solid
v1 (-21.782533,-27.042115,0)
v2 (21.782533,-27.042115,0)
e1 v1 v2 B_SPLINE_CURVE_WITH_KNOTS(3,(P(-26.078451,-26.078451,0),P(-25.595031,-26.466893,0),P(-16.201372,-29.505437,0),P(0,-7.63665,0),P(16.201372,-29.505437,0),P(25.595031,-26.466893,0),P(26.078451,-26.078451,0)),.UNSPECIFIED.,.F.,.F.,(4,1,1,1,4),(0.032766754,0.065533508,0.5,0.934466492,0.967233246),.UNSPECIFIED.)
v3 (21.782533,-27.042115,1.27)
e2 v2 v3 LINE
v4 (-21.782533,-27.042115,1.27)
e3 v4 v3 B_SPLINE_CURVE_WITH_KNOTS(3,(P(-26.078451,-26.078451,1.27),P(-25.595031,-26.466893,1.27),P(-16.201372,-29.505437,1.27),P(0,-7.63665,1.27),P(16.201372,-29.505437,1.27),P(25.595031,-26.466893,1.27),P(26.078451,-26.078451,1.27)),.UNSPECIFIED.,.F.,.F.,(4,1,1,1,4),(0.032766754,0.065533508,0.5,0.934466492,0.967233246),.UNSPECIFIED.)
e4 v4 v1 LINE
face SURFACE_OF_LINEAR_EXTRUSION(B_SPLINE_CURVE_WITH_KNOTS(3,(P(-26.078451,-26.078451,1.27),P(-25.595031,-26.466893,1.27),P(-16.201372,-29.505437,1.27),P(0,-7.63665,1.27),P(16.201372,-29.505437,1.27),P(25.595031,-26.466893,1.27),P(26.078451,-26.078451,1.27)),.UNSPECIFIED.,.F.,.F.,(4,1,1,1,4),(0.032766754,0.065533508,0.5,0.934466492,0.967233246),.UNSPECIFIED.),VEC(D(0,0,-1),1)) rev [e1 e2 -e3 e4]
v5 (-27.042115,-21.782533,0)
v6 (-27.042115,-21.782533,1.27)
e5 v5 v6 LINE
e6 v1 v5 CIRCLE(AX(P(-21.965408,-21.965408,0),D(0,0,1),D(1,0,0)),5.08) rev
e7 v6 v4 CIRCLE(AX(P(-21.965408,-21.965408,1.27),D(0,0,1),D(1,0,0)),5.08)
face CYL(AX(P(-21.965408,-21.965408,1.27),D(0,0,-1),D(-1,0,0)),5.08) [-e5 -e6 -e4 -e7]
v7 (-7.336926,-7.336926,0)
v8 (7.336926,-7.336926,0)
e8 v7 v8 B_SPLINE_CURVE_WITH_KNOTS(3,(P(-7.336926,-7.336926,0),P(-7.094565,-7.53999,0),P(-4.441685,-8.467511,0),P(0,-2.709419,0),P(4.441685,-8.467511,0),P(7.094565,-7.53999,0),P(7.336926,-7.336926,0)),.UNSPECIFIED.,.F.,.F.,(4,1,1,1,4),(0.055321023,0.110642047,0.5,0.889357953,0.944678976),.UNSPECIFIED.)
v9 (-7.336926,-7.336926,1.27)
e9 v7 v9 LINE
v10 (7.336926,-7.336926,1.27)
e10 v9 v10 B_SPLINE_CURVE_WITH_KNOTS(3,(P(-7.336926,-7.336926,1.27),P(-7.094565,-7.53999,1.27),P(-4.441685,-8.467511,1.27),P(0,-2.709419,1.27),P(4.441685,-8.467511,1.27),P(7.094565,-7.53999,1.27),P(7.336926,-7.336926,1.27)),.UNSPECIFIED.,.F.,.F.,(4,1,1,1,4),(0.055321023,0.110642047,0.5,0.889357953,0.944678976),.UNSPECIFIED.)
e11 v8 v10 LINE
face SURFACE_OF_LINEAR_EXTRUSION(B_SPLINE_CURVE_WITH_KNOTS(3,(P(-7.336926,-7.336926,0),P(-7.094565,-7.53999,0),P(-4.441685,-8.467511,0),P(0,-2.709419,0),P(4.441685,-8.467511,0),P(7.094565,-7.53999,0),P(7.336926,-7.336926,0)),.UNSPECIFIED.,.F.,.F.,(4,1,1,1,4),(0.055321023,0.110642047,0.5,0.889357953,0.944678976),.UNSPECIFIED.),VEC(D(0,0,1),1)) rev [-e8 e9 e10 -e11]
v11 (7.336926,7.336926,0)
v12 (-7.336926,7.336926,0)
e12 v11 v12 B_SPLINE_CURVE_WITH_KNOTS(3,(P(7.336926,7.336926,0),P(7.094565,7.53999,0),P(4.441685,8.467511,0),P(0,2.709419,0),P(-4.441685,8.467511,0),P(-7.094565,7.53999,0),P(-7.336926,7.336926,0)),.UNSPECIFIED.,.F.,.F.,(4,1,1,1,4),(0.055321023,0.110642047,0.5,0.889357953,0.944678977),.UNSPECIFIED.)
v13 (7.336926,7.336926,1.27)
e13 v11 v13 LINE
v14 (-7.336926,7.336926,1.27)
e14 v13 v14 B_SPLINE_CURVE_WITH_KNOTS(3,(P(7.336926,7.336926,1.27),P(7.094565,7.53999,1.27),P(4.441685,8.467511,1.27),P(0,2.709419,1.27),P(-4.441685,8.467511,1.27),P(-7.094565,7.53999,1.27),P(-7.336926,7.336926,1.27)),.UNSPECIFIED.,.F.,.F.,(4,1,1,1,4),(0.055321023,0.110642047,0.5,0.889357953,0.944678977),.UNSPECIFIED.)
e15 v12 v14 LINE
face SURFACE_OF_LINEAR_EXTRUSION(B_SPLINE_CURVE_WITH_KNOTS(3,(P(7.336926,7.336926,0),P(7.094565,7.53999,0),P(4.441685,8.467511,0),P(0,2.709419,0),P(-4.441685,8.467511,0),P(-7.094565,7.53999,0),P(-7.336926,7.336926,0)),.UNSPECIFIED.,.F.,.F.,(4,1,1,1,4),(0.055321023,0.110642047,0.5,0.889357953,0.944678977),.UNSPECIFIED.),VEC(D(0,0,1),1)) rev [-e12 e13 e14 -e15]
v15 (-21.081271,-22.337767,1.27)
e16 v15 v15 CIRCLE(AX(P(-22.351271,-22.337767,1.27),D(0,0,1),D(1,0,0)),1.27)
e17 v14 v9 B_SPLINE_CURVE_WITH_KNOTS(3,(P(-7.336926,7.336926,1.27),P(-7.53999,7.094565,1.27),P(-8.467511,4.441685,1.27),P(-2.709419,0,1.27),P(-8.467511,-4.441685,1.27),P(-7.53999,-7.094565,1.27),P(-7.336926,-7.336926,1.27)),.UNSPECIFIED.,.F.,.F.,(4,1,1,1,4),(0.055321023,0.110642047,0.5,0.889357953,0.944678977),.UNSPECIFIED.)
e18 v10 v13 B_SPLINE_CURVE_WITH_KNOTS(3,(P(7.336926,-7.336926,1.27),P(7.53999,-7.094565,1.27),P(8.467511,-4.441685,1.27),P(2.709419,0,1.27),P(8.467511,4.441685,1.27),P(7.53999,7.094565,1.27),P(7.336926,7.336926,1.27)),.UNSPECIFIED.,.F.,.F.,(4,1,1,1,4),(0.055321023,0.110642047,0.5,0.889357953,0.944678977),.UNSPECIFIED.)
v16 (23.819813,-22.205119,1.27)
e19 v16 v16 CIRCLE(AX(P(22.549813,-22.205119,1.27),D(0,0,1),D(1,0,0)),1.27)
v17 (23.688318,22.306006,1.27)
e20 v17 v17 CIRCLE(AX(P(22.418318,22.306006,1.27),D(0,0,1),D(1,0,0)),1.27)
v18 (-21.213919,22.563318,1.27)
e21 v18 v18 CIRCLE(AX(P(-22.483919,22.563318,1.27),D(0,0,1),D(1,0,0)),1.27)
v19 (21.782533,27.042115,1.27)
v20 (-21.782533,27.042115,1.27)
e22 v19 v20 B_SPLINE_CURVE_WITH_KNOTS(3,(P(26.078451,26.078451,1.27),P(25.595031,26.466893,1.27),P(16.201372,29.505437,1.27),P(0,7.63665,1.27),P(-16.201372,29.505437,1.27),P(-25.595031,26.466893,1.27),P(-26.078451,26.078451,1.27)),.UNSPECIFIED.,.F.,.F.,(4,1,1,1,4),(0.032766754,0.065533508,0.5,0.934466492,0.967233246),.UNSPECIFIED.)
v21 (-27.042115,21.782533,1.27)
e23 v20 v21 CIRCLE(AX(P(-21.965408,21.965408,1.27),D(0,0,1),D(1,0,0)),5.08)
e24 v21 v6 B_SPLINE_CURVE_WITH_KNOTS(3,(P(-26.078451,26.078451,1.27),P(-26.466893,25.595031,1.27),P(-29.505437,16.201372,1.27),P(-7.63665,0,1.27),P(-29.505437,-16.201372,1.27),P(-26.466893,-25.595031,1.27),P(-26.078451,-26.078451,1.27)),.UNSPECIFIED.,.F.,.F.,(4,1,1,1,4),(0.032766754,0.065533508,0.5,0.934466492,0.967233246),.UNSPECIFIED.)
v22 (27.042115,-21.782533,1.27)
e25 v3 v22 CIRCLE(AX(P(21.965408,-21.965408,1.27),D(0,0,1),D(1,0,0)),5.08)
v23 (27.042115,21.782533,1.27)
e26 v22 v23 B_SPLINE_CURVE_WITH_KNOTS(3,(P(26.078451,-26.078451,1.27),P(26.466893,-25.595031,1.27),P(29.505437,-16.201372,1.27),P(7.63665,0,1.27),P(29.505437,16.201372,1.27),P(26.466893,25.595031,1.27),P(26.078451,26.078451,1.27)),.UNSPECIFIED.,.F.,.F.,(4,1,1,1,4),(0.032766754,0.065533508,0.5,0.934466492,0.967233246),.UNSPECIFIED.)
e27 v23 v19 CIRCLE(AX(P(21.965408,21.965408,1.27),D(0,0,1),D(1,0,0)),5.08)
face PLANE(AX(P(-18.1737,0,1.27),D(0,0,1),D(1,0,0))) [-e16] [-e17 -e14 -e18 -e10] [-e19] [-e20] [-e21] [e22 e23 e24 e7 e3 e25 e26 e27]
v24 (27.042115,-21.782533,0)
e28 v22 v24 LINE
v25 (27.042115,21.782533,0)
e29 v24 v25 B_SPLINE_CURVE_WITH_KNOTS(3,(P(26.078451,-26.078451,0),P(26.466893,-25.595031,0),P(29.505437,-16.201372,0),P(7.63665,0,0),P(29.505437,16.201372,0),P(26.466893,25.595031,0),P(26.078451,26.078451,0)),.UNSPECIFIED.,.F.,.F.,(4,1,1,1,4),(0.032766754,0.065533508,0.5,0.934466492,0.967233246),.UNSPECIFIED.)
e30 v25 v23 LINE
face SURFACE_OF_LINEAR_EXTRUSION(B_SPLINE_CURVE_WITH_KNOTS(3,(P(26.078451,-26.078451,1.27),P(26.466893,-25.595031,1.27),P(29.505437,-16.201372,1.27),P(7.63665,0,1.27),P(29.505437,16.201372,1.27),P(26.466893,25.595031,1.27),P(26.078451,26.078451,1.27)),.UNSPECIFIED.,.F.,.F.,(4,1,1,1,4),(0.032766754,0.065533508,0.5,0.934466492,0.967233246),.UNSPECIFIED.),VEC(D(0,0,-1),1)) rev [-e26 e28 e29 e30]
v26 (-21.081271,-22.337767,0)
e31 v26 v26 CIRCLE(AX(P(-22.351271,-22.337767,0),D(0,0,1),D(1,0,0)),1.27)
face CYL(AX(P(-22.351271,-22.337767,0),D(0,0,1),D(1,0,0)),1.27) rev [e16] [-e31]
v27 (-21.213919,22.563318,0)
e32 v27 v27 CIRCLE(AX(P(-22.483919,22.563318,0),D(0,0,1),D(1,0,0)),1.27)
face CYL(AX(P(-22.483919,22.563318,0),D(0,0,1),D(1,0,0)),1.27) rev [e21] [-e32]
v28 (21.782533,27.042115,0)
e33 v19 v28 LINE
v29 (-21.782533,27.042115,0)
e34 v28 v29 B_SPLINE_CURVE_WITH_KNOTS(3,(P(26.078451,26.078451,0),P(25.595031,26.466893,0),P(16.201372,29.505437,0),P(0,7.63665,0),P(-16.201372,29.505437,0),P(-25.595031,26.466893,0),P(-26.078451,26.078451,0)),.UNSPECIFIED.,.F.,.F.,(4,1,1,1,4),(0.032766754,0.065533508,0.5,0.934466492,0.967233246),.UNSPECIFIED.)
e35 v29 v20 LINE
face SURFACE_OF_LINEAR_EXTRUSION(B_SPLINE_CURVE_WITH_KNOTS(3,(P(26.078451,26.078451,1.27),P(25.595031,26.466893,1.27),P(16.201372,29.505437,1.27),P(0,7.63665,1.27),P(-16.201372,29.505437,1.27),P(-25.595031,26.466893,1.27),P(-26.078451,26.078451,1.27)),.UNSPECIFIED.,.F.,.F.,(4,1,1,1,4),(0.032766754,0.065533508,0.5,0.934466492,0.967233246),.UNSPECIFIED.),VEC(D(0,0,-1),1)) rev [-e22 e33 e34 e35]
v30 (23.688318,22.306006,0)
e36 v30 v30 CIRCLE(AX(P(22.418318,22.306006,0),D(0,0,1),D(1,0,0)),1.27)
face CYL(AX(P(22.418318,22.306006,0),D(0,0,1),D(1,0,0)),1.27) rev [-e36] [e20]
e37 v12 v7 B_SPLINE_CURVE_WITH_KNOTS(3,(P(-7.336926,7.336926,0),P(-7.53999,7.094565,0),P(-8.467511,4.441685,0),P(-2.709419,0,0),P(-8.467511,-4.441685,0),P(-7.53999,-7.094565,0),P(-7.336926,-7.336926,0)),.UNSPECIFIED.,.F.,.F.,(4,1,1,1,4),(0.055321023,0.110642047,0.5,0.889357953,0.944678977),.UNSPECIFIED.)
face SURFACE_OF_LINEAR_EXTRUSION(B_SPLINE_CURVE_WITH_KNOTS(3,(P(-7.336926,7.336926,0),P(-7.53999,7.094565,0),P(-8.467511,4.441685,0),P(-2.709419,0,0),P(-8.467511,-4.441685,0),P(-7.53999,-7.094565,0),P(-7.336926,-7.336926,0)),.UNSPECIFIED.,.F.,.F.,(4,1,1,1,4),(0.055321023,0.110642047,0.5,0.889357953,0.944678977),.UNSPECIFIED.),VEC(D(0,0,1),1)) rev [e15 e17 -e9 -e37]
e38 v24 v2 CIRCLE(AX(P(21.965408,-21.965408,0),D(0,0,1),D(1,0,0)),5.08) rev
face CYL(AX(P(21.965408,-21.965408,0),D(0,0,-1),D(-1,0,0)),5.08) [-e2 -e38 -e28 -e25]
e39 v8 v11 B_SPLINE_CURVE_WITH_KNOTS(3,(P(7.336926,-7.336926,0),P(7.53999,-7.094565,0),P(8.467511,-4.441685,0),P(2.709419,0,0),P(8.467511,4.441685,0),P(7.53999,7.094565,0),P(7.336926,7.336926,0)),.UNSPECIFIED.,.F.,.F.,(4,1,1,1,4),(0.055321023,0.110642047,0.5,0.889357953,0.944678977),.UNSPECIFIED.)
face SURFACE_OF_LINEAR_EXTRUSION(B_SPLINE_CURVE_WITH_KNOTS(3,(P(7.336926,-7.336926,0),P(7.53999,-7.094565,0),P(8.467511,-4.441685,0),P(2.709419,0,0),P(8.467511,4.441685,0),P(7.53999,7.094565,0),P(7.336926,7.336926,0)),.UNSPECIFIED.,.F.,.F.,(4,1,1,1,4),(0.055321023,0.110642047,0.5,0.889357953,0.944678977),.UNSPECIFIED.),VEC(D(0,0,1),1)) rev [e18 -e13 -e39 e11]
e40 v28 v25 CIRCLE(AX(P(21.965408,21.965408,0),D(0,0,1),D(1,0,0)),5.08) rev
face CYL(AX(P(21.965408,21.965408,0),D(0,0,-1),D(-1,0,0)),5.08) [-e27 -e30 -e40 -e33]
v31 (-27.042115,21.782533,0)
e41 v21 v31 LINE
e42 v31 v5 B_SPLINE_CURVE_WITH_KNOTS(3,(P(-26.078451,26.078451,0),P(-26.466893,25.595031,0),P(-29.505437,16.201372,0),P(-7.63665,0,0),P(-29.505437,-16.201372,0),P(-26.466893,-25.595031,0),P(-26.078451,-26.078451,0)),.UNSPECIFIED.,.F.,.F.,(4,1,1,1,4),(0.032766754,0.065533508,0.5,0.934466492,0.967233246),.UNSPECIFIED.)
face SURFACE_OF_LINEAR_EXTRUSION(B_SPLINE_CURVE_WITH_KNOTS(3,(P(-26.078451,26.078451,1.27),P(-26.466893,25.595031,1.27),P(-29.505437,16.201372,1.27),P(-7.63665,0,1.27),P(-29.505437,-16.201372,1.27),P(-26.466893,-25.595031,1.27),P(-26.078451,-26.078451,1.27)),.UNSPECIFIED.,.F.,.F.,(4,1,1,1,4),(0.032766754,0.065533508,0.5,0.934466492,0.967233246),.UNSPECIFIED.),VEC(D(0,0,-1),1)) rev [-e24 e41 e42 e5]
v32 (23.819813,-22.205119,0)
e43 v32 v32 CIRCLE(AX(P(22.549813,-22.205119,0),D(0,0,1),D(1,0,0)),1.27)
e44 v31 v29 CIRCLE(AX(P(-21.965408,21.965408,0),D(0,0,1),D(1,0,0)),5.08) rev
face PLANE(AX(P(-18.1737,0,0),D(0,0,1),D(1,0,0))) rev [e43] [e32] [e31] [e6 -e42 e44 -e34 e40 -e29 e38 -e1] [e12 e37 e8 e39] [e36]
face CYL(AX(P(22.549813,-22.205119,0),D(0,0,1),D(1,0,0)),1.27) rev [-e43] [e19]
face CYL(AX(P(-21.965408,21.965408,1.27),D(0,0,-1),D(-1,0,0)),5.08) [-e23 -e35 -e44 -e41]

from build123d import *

# Parameters (mm, degrees)
BOSS_EXTRUDE1_DEPTH = 1.27
FILLET1_START       = -1
FILLET1_DEPTH       = 3
FILLET2_START       = -1
FILLET2_DEPTH       = 3
FILLET3_R           = 5.08
FILLET4_R           = 5.08
SKETCH3_R           = 1.27
CUT_EXTRUDE1_DEPTH  = 39.269062151


with BuildPart() as part:
    # Sketch1 → Boss-Extrude1 (new body)
    with BuildSketch(Plane.XY):
        with BuildLine():
            add(Edge.make_bspline(
                [(-26.078451224, -26.078451224), (-25.595030672, -26.46689269), (-16.201372292, -29.50543677), (0, -7.636650328), (16.201372291, -29.50543677), (25.595030672, -26.46689269), (26.078451224, -26.078451224)],
                knots=[0.032766754, 0.032766754, 0.032766754, 0.032766754, 0.065533508, 0.5, 0.934466492, 0.967233246, 0.967233246, 0.967233246, 0.967233246], degree=3))
            add(Edge.make_bspline(
                [(26.078451224, -26.078451224), (26.46689269, -25.595030672), (29.505436772, -16.201372289), (7.636650328, -2e-09), (29.505436768, 16.201372294), (26.46689269, 25.595030672), (26.078451224, 26.078451224)],
                knots=[0.032766754, 0.032766754, 0.032766754, 0.032766754, 0.065533508, 0.5, 0.934466492, 0.967233246, 0.967233246, 0.967233246, 0.967233246], degree=3))
            add(Edge.make_bspline(
                [(-26.078451224, 26.078451224), (-25.595030672, 26.46689269), (-16.201372292, 29.50543677), (0, 7.636650328), (16.201372291, 29.50543677), (25.595030672, 26.46689269), (26.078451224, 26.078451224)],
                knots=[0.032766754, 0.032766754, 0.032766754, 0.032766754, 0.065533508, 0.5, 0.934466492, 0.967233246, 0.967233246, 0.967233246, 0.967233246], degree=3))
            add(Edge.make_bspline(
                [(-26.078451224, -26.078451224), (-26.46689269, -25.595030672), (-29.50543677, -16.201372292), (-7.636650328, 0), (-29.50543677, 16.201372291), (-26.46689269, 25.595030672), (-26.078451224, 26.078451224)],
                knots=[0.032766754, 0.032766754, 0.032766754, 0.032766754, 0.065533508, 0.5, 0.934466492, 0.967233246, 0.967233246, 0.967233246, 0.967233246], degree=3))
        make_face()
    extrude(amount=BOSS_EXTRUDE1_DEPTH)

    # Fillet1: read off the stored shape, not the designer's step
    # Fillet1 outline → Fillet1 (cut)
    with BuildSketch(Plane.XY.offset(FILLET1_START)):
        with BuildLine():
            add(Edge.make_bspline(
                [(26.078451224, 26.078451224), (25.595030672, 26.46689269), (24.088787806, 26.954113447), (22.608220096, 27.071858625), (21.782533291, 27.042115453)],
                knots=[0.032766754, 0.032766754, 0.032766754, 0.032766754, 0.065533508, 0.1076861, 0.1076861, 0.1076861, 0.1076861], degree=3))
            ThreePointArc((21.782533291, 27.042115453), (25.557510624, 25.557510623), (27.042115452, 21.78253329))
            add(Edge.make_bspline(
                [(27.042115452, 21.78253329), (27.071858625, 22.608220095), (26.954113447, 24.088787806), (26.46689269, 25.595030672), (26.078451224, 26.078451224)],
                knots=[0.8923139, 0.8923139, 0.8923139, 0.8923139, 0.934466492, 0.967233246, 0.967233246, 0.967233246, 0.967233246], degree=3))
        make_face()
    extrude(amount=FILLET1_DEPTH, mode=Mode.SUBTRACT)

    # Fillet2: read off the stored shape, not the designer's step
    # Fillet2 outline → Fillet2 (cut)
    with BuildSketch(Plane.XY.offset(FILLET2_START)):
        with BuildLine():
            add(Edge.make_bspline(
                [(-26.078451224, -26.078451224), (-25.595030672, -26.46689269), (-24.088787806, -26.954113447), (-22.608220096, -27.071858625), (-21.782533291, -27.042115453)],
                knots=[0.032766754, 0.032766754, 0.032766754, 0.032766754, 0.065533508, 0.1076861, 0.1076861, 0.1076861, 0.1076861], degree=3))
            ThreePointArc((-21.782533291, -27.042115453), (-25.557510624, -25.557510624), (-27.042115453, -21.782533291))
            add(Edge.make_bspline(
                [(-27.042115453, -21.782533291), (-27.071858625, -22.608220096), (-26.954113447, -24.088787806), (-26.46689269, -25.595030672), (-26.078451224, -26.078451224)],
                knots=[0.8923139, 0.8923139, 0.8923139, 0.8923139, 0.934466492, 0.967233246, 0.967233246, 0.967233246, 0.967233246], degree=3))
        make_face()
    extrude(amount=FILLET2_DEPTH, mode=Mode.SUBTRACT)

    # Fillet3
    fillet3_edges = [part.edges().sort_by_distance(p)[0] for p in [
        (-26.078451224, 26.078451224, 0.635),
    ]]
    fillet(fillet3_edges, radius=FILLET3_R)

    # Fillet4
    fillet4_edges = [part.edges().sort_by_distance(p)[0] for p in [
        (26.078451224, -26.078451224, 0.635),
    ]]
    fillet(fillet4_edges, radius=FILLET4_R)

    # Sketch3 → Cut-Extrude1 (cut, through all)
    with BuildSketch(Plane.XY.offset(1.27)):
        with Locations((-22.483919179, 22.563317918)):
            Circle(SKETCH3_R)
        with Locations((-22.351271412, -22.337766752)):
            Circle(SKETCH3_R)
        with Locations((22.549813258, -22.205118985)):
            Circle(SKETCH3_R)
        with Locations((22.418317518, 22.306006297)):
            Circle(SKETCH3_R)
        with BuildLine():
            add(Edge.make_bspline(
                [(-7.336925612, -7.336925612), (-7.094564954, -7.539990493), (-4.441685448, -8.467510629), (0, -2.70941912), (4.441685448, -8.467510629), (7.094564954, -7.539990493), (7.336925612, -7.336925612)],
                knots=[0.055321023, 0.055321023, 0.055321023, 0.055321023, 0.110642047, 0.5, 0.889357953, 0.944678976, 0.944678976, 0.944678976, 0.944678976], degree=3))
            add(Edge.make_bspline(
                [(7.336925612, 7.336925612), (7.539990493, 7.094564954), (8.467510629, 4.441685448), (2.70941912, 0), (8.467510629, -4.441685448), (7.539990493, -7.094564954), (7.336925612, -7.336925612)],
                knots=[0.055321023, 0.055321023, 0.055321023, 0.055321023, 0.110642047, 0.5, 0.889357953, 0.944678977, 0.944678977, 0.944678977, 0.944678977], degree=3))
            add(Edge.make_bspline(
                [(-7.336925612, 7.336925612), (-7.094564954, 7.539990493), (-4.441685448, 8.467510629), (0, 2.70941912), (4.441685448, 8.467510629), (7.094564954, 7.539990493), (7.336925612, 7.336925612)],
                knots=[0.055321023, 0.055321023, 0.055321023, 0.055321023, 0.110642047, 0.5, 0.889357953, 0.944678977, 0.944678977, 0.944678977, 0.944678977], degree=3))
            add(Edge.make_bspline(
                [(-7.336925612, 7.336925612), (-7.539990493, 7.094564954), (-8.467510629, 4.441685448), (-2.70941912, 0), (-8.467510629, -4.441685448), (-7.539990493, -7.094564954), (-7.336925612, -7.336925612)],
                knots=[0.055321023, 0.055321023, 0.055321023, 0.055321023, 0.110642047, 0.5, 0.889357953, 0.944678977, 0.944678977, 0.944678977, 0.944678977], degree=3))
        make_face()
    extrude(amount=-CUT_EXTRUDE1_DEPTH, mode=Mode.SUBTRACT)


solid = part.part
